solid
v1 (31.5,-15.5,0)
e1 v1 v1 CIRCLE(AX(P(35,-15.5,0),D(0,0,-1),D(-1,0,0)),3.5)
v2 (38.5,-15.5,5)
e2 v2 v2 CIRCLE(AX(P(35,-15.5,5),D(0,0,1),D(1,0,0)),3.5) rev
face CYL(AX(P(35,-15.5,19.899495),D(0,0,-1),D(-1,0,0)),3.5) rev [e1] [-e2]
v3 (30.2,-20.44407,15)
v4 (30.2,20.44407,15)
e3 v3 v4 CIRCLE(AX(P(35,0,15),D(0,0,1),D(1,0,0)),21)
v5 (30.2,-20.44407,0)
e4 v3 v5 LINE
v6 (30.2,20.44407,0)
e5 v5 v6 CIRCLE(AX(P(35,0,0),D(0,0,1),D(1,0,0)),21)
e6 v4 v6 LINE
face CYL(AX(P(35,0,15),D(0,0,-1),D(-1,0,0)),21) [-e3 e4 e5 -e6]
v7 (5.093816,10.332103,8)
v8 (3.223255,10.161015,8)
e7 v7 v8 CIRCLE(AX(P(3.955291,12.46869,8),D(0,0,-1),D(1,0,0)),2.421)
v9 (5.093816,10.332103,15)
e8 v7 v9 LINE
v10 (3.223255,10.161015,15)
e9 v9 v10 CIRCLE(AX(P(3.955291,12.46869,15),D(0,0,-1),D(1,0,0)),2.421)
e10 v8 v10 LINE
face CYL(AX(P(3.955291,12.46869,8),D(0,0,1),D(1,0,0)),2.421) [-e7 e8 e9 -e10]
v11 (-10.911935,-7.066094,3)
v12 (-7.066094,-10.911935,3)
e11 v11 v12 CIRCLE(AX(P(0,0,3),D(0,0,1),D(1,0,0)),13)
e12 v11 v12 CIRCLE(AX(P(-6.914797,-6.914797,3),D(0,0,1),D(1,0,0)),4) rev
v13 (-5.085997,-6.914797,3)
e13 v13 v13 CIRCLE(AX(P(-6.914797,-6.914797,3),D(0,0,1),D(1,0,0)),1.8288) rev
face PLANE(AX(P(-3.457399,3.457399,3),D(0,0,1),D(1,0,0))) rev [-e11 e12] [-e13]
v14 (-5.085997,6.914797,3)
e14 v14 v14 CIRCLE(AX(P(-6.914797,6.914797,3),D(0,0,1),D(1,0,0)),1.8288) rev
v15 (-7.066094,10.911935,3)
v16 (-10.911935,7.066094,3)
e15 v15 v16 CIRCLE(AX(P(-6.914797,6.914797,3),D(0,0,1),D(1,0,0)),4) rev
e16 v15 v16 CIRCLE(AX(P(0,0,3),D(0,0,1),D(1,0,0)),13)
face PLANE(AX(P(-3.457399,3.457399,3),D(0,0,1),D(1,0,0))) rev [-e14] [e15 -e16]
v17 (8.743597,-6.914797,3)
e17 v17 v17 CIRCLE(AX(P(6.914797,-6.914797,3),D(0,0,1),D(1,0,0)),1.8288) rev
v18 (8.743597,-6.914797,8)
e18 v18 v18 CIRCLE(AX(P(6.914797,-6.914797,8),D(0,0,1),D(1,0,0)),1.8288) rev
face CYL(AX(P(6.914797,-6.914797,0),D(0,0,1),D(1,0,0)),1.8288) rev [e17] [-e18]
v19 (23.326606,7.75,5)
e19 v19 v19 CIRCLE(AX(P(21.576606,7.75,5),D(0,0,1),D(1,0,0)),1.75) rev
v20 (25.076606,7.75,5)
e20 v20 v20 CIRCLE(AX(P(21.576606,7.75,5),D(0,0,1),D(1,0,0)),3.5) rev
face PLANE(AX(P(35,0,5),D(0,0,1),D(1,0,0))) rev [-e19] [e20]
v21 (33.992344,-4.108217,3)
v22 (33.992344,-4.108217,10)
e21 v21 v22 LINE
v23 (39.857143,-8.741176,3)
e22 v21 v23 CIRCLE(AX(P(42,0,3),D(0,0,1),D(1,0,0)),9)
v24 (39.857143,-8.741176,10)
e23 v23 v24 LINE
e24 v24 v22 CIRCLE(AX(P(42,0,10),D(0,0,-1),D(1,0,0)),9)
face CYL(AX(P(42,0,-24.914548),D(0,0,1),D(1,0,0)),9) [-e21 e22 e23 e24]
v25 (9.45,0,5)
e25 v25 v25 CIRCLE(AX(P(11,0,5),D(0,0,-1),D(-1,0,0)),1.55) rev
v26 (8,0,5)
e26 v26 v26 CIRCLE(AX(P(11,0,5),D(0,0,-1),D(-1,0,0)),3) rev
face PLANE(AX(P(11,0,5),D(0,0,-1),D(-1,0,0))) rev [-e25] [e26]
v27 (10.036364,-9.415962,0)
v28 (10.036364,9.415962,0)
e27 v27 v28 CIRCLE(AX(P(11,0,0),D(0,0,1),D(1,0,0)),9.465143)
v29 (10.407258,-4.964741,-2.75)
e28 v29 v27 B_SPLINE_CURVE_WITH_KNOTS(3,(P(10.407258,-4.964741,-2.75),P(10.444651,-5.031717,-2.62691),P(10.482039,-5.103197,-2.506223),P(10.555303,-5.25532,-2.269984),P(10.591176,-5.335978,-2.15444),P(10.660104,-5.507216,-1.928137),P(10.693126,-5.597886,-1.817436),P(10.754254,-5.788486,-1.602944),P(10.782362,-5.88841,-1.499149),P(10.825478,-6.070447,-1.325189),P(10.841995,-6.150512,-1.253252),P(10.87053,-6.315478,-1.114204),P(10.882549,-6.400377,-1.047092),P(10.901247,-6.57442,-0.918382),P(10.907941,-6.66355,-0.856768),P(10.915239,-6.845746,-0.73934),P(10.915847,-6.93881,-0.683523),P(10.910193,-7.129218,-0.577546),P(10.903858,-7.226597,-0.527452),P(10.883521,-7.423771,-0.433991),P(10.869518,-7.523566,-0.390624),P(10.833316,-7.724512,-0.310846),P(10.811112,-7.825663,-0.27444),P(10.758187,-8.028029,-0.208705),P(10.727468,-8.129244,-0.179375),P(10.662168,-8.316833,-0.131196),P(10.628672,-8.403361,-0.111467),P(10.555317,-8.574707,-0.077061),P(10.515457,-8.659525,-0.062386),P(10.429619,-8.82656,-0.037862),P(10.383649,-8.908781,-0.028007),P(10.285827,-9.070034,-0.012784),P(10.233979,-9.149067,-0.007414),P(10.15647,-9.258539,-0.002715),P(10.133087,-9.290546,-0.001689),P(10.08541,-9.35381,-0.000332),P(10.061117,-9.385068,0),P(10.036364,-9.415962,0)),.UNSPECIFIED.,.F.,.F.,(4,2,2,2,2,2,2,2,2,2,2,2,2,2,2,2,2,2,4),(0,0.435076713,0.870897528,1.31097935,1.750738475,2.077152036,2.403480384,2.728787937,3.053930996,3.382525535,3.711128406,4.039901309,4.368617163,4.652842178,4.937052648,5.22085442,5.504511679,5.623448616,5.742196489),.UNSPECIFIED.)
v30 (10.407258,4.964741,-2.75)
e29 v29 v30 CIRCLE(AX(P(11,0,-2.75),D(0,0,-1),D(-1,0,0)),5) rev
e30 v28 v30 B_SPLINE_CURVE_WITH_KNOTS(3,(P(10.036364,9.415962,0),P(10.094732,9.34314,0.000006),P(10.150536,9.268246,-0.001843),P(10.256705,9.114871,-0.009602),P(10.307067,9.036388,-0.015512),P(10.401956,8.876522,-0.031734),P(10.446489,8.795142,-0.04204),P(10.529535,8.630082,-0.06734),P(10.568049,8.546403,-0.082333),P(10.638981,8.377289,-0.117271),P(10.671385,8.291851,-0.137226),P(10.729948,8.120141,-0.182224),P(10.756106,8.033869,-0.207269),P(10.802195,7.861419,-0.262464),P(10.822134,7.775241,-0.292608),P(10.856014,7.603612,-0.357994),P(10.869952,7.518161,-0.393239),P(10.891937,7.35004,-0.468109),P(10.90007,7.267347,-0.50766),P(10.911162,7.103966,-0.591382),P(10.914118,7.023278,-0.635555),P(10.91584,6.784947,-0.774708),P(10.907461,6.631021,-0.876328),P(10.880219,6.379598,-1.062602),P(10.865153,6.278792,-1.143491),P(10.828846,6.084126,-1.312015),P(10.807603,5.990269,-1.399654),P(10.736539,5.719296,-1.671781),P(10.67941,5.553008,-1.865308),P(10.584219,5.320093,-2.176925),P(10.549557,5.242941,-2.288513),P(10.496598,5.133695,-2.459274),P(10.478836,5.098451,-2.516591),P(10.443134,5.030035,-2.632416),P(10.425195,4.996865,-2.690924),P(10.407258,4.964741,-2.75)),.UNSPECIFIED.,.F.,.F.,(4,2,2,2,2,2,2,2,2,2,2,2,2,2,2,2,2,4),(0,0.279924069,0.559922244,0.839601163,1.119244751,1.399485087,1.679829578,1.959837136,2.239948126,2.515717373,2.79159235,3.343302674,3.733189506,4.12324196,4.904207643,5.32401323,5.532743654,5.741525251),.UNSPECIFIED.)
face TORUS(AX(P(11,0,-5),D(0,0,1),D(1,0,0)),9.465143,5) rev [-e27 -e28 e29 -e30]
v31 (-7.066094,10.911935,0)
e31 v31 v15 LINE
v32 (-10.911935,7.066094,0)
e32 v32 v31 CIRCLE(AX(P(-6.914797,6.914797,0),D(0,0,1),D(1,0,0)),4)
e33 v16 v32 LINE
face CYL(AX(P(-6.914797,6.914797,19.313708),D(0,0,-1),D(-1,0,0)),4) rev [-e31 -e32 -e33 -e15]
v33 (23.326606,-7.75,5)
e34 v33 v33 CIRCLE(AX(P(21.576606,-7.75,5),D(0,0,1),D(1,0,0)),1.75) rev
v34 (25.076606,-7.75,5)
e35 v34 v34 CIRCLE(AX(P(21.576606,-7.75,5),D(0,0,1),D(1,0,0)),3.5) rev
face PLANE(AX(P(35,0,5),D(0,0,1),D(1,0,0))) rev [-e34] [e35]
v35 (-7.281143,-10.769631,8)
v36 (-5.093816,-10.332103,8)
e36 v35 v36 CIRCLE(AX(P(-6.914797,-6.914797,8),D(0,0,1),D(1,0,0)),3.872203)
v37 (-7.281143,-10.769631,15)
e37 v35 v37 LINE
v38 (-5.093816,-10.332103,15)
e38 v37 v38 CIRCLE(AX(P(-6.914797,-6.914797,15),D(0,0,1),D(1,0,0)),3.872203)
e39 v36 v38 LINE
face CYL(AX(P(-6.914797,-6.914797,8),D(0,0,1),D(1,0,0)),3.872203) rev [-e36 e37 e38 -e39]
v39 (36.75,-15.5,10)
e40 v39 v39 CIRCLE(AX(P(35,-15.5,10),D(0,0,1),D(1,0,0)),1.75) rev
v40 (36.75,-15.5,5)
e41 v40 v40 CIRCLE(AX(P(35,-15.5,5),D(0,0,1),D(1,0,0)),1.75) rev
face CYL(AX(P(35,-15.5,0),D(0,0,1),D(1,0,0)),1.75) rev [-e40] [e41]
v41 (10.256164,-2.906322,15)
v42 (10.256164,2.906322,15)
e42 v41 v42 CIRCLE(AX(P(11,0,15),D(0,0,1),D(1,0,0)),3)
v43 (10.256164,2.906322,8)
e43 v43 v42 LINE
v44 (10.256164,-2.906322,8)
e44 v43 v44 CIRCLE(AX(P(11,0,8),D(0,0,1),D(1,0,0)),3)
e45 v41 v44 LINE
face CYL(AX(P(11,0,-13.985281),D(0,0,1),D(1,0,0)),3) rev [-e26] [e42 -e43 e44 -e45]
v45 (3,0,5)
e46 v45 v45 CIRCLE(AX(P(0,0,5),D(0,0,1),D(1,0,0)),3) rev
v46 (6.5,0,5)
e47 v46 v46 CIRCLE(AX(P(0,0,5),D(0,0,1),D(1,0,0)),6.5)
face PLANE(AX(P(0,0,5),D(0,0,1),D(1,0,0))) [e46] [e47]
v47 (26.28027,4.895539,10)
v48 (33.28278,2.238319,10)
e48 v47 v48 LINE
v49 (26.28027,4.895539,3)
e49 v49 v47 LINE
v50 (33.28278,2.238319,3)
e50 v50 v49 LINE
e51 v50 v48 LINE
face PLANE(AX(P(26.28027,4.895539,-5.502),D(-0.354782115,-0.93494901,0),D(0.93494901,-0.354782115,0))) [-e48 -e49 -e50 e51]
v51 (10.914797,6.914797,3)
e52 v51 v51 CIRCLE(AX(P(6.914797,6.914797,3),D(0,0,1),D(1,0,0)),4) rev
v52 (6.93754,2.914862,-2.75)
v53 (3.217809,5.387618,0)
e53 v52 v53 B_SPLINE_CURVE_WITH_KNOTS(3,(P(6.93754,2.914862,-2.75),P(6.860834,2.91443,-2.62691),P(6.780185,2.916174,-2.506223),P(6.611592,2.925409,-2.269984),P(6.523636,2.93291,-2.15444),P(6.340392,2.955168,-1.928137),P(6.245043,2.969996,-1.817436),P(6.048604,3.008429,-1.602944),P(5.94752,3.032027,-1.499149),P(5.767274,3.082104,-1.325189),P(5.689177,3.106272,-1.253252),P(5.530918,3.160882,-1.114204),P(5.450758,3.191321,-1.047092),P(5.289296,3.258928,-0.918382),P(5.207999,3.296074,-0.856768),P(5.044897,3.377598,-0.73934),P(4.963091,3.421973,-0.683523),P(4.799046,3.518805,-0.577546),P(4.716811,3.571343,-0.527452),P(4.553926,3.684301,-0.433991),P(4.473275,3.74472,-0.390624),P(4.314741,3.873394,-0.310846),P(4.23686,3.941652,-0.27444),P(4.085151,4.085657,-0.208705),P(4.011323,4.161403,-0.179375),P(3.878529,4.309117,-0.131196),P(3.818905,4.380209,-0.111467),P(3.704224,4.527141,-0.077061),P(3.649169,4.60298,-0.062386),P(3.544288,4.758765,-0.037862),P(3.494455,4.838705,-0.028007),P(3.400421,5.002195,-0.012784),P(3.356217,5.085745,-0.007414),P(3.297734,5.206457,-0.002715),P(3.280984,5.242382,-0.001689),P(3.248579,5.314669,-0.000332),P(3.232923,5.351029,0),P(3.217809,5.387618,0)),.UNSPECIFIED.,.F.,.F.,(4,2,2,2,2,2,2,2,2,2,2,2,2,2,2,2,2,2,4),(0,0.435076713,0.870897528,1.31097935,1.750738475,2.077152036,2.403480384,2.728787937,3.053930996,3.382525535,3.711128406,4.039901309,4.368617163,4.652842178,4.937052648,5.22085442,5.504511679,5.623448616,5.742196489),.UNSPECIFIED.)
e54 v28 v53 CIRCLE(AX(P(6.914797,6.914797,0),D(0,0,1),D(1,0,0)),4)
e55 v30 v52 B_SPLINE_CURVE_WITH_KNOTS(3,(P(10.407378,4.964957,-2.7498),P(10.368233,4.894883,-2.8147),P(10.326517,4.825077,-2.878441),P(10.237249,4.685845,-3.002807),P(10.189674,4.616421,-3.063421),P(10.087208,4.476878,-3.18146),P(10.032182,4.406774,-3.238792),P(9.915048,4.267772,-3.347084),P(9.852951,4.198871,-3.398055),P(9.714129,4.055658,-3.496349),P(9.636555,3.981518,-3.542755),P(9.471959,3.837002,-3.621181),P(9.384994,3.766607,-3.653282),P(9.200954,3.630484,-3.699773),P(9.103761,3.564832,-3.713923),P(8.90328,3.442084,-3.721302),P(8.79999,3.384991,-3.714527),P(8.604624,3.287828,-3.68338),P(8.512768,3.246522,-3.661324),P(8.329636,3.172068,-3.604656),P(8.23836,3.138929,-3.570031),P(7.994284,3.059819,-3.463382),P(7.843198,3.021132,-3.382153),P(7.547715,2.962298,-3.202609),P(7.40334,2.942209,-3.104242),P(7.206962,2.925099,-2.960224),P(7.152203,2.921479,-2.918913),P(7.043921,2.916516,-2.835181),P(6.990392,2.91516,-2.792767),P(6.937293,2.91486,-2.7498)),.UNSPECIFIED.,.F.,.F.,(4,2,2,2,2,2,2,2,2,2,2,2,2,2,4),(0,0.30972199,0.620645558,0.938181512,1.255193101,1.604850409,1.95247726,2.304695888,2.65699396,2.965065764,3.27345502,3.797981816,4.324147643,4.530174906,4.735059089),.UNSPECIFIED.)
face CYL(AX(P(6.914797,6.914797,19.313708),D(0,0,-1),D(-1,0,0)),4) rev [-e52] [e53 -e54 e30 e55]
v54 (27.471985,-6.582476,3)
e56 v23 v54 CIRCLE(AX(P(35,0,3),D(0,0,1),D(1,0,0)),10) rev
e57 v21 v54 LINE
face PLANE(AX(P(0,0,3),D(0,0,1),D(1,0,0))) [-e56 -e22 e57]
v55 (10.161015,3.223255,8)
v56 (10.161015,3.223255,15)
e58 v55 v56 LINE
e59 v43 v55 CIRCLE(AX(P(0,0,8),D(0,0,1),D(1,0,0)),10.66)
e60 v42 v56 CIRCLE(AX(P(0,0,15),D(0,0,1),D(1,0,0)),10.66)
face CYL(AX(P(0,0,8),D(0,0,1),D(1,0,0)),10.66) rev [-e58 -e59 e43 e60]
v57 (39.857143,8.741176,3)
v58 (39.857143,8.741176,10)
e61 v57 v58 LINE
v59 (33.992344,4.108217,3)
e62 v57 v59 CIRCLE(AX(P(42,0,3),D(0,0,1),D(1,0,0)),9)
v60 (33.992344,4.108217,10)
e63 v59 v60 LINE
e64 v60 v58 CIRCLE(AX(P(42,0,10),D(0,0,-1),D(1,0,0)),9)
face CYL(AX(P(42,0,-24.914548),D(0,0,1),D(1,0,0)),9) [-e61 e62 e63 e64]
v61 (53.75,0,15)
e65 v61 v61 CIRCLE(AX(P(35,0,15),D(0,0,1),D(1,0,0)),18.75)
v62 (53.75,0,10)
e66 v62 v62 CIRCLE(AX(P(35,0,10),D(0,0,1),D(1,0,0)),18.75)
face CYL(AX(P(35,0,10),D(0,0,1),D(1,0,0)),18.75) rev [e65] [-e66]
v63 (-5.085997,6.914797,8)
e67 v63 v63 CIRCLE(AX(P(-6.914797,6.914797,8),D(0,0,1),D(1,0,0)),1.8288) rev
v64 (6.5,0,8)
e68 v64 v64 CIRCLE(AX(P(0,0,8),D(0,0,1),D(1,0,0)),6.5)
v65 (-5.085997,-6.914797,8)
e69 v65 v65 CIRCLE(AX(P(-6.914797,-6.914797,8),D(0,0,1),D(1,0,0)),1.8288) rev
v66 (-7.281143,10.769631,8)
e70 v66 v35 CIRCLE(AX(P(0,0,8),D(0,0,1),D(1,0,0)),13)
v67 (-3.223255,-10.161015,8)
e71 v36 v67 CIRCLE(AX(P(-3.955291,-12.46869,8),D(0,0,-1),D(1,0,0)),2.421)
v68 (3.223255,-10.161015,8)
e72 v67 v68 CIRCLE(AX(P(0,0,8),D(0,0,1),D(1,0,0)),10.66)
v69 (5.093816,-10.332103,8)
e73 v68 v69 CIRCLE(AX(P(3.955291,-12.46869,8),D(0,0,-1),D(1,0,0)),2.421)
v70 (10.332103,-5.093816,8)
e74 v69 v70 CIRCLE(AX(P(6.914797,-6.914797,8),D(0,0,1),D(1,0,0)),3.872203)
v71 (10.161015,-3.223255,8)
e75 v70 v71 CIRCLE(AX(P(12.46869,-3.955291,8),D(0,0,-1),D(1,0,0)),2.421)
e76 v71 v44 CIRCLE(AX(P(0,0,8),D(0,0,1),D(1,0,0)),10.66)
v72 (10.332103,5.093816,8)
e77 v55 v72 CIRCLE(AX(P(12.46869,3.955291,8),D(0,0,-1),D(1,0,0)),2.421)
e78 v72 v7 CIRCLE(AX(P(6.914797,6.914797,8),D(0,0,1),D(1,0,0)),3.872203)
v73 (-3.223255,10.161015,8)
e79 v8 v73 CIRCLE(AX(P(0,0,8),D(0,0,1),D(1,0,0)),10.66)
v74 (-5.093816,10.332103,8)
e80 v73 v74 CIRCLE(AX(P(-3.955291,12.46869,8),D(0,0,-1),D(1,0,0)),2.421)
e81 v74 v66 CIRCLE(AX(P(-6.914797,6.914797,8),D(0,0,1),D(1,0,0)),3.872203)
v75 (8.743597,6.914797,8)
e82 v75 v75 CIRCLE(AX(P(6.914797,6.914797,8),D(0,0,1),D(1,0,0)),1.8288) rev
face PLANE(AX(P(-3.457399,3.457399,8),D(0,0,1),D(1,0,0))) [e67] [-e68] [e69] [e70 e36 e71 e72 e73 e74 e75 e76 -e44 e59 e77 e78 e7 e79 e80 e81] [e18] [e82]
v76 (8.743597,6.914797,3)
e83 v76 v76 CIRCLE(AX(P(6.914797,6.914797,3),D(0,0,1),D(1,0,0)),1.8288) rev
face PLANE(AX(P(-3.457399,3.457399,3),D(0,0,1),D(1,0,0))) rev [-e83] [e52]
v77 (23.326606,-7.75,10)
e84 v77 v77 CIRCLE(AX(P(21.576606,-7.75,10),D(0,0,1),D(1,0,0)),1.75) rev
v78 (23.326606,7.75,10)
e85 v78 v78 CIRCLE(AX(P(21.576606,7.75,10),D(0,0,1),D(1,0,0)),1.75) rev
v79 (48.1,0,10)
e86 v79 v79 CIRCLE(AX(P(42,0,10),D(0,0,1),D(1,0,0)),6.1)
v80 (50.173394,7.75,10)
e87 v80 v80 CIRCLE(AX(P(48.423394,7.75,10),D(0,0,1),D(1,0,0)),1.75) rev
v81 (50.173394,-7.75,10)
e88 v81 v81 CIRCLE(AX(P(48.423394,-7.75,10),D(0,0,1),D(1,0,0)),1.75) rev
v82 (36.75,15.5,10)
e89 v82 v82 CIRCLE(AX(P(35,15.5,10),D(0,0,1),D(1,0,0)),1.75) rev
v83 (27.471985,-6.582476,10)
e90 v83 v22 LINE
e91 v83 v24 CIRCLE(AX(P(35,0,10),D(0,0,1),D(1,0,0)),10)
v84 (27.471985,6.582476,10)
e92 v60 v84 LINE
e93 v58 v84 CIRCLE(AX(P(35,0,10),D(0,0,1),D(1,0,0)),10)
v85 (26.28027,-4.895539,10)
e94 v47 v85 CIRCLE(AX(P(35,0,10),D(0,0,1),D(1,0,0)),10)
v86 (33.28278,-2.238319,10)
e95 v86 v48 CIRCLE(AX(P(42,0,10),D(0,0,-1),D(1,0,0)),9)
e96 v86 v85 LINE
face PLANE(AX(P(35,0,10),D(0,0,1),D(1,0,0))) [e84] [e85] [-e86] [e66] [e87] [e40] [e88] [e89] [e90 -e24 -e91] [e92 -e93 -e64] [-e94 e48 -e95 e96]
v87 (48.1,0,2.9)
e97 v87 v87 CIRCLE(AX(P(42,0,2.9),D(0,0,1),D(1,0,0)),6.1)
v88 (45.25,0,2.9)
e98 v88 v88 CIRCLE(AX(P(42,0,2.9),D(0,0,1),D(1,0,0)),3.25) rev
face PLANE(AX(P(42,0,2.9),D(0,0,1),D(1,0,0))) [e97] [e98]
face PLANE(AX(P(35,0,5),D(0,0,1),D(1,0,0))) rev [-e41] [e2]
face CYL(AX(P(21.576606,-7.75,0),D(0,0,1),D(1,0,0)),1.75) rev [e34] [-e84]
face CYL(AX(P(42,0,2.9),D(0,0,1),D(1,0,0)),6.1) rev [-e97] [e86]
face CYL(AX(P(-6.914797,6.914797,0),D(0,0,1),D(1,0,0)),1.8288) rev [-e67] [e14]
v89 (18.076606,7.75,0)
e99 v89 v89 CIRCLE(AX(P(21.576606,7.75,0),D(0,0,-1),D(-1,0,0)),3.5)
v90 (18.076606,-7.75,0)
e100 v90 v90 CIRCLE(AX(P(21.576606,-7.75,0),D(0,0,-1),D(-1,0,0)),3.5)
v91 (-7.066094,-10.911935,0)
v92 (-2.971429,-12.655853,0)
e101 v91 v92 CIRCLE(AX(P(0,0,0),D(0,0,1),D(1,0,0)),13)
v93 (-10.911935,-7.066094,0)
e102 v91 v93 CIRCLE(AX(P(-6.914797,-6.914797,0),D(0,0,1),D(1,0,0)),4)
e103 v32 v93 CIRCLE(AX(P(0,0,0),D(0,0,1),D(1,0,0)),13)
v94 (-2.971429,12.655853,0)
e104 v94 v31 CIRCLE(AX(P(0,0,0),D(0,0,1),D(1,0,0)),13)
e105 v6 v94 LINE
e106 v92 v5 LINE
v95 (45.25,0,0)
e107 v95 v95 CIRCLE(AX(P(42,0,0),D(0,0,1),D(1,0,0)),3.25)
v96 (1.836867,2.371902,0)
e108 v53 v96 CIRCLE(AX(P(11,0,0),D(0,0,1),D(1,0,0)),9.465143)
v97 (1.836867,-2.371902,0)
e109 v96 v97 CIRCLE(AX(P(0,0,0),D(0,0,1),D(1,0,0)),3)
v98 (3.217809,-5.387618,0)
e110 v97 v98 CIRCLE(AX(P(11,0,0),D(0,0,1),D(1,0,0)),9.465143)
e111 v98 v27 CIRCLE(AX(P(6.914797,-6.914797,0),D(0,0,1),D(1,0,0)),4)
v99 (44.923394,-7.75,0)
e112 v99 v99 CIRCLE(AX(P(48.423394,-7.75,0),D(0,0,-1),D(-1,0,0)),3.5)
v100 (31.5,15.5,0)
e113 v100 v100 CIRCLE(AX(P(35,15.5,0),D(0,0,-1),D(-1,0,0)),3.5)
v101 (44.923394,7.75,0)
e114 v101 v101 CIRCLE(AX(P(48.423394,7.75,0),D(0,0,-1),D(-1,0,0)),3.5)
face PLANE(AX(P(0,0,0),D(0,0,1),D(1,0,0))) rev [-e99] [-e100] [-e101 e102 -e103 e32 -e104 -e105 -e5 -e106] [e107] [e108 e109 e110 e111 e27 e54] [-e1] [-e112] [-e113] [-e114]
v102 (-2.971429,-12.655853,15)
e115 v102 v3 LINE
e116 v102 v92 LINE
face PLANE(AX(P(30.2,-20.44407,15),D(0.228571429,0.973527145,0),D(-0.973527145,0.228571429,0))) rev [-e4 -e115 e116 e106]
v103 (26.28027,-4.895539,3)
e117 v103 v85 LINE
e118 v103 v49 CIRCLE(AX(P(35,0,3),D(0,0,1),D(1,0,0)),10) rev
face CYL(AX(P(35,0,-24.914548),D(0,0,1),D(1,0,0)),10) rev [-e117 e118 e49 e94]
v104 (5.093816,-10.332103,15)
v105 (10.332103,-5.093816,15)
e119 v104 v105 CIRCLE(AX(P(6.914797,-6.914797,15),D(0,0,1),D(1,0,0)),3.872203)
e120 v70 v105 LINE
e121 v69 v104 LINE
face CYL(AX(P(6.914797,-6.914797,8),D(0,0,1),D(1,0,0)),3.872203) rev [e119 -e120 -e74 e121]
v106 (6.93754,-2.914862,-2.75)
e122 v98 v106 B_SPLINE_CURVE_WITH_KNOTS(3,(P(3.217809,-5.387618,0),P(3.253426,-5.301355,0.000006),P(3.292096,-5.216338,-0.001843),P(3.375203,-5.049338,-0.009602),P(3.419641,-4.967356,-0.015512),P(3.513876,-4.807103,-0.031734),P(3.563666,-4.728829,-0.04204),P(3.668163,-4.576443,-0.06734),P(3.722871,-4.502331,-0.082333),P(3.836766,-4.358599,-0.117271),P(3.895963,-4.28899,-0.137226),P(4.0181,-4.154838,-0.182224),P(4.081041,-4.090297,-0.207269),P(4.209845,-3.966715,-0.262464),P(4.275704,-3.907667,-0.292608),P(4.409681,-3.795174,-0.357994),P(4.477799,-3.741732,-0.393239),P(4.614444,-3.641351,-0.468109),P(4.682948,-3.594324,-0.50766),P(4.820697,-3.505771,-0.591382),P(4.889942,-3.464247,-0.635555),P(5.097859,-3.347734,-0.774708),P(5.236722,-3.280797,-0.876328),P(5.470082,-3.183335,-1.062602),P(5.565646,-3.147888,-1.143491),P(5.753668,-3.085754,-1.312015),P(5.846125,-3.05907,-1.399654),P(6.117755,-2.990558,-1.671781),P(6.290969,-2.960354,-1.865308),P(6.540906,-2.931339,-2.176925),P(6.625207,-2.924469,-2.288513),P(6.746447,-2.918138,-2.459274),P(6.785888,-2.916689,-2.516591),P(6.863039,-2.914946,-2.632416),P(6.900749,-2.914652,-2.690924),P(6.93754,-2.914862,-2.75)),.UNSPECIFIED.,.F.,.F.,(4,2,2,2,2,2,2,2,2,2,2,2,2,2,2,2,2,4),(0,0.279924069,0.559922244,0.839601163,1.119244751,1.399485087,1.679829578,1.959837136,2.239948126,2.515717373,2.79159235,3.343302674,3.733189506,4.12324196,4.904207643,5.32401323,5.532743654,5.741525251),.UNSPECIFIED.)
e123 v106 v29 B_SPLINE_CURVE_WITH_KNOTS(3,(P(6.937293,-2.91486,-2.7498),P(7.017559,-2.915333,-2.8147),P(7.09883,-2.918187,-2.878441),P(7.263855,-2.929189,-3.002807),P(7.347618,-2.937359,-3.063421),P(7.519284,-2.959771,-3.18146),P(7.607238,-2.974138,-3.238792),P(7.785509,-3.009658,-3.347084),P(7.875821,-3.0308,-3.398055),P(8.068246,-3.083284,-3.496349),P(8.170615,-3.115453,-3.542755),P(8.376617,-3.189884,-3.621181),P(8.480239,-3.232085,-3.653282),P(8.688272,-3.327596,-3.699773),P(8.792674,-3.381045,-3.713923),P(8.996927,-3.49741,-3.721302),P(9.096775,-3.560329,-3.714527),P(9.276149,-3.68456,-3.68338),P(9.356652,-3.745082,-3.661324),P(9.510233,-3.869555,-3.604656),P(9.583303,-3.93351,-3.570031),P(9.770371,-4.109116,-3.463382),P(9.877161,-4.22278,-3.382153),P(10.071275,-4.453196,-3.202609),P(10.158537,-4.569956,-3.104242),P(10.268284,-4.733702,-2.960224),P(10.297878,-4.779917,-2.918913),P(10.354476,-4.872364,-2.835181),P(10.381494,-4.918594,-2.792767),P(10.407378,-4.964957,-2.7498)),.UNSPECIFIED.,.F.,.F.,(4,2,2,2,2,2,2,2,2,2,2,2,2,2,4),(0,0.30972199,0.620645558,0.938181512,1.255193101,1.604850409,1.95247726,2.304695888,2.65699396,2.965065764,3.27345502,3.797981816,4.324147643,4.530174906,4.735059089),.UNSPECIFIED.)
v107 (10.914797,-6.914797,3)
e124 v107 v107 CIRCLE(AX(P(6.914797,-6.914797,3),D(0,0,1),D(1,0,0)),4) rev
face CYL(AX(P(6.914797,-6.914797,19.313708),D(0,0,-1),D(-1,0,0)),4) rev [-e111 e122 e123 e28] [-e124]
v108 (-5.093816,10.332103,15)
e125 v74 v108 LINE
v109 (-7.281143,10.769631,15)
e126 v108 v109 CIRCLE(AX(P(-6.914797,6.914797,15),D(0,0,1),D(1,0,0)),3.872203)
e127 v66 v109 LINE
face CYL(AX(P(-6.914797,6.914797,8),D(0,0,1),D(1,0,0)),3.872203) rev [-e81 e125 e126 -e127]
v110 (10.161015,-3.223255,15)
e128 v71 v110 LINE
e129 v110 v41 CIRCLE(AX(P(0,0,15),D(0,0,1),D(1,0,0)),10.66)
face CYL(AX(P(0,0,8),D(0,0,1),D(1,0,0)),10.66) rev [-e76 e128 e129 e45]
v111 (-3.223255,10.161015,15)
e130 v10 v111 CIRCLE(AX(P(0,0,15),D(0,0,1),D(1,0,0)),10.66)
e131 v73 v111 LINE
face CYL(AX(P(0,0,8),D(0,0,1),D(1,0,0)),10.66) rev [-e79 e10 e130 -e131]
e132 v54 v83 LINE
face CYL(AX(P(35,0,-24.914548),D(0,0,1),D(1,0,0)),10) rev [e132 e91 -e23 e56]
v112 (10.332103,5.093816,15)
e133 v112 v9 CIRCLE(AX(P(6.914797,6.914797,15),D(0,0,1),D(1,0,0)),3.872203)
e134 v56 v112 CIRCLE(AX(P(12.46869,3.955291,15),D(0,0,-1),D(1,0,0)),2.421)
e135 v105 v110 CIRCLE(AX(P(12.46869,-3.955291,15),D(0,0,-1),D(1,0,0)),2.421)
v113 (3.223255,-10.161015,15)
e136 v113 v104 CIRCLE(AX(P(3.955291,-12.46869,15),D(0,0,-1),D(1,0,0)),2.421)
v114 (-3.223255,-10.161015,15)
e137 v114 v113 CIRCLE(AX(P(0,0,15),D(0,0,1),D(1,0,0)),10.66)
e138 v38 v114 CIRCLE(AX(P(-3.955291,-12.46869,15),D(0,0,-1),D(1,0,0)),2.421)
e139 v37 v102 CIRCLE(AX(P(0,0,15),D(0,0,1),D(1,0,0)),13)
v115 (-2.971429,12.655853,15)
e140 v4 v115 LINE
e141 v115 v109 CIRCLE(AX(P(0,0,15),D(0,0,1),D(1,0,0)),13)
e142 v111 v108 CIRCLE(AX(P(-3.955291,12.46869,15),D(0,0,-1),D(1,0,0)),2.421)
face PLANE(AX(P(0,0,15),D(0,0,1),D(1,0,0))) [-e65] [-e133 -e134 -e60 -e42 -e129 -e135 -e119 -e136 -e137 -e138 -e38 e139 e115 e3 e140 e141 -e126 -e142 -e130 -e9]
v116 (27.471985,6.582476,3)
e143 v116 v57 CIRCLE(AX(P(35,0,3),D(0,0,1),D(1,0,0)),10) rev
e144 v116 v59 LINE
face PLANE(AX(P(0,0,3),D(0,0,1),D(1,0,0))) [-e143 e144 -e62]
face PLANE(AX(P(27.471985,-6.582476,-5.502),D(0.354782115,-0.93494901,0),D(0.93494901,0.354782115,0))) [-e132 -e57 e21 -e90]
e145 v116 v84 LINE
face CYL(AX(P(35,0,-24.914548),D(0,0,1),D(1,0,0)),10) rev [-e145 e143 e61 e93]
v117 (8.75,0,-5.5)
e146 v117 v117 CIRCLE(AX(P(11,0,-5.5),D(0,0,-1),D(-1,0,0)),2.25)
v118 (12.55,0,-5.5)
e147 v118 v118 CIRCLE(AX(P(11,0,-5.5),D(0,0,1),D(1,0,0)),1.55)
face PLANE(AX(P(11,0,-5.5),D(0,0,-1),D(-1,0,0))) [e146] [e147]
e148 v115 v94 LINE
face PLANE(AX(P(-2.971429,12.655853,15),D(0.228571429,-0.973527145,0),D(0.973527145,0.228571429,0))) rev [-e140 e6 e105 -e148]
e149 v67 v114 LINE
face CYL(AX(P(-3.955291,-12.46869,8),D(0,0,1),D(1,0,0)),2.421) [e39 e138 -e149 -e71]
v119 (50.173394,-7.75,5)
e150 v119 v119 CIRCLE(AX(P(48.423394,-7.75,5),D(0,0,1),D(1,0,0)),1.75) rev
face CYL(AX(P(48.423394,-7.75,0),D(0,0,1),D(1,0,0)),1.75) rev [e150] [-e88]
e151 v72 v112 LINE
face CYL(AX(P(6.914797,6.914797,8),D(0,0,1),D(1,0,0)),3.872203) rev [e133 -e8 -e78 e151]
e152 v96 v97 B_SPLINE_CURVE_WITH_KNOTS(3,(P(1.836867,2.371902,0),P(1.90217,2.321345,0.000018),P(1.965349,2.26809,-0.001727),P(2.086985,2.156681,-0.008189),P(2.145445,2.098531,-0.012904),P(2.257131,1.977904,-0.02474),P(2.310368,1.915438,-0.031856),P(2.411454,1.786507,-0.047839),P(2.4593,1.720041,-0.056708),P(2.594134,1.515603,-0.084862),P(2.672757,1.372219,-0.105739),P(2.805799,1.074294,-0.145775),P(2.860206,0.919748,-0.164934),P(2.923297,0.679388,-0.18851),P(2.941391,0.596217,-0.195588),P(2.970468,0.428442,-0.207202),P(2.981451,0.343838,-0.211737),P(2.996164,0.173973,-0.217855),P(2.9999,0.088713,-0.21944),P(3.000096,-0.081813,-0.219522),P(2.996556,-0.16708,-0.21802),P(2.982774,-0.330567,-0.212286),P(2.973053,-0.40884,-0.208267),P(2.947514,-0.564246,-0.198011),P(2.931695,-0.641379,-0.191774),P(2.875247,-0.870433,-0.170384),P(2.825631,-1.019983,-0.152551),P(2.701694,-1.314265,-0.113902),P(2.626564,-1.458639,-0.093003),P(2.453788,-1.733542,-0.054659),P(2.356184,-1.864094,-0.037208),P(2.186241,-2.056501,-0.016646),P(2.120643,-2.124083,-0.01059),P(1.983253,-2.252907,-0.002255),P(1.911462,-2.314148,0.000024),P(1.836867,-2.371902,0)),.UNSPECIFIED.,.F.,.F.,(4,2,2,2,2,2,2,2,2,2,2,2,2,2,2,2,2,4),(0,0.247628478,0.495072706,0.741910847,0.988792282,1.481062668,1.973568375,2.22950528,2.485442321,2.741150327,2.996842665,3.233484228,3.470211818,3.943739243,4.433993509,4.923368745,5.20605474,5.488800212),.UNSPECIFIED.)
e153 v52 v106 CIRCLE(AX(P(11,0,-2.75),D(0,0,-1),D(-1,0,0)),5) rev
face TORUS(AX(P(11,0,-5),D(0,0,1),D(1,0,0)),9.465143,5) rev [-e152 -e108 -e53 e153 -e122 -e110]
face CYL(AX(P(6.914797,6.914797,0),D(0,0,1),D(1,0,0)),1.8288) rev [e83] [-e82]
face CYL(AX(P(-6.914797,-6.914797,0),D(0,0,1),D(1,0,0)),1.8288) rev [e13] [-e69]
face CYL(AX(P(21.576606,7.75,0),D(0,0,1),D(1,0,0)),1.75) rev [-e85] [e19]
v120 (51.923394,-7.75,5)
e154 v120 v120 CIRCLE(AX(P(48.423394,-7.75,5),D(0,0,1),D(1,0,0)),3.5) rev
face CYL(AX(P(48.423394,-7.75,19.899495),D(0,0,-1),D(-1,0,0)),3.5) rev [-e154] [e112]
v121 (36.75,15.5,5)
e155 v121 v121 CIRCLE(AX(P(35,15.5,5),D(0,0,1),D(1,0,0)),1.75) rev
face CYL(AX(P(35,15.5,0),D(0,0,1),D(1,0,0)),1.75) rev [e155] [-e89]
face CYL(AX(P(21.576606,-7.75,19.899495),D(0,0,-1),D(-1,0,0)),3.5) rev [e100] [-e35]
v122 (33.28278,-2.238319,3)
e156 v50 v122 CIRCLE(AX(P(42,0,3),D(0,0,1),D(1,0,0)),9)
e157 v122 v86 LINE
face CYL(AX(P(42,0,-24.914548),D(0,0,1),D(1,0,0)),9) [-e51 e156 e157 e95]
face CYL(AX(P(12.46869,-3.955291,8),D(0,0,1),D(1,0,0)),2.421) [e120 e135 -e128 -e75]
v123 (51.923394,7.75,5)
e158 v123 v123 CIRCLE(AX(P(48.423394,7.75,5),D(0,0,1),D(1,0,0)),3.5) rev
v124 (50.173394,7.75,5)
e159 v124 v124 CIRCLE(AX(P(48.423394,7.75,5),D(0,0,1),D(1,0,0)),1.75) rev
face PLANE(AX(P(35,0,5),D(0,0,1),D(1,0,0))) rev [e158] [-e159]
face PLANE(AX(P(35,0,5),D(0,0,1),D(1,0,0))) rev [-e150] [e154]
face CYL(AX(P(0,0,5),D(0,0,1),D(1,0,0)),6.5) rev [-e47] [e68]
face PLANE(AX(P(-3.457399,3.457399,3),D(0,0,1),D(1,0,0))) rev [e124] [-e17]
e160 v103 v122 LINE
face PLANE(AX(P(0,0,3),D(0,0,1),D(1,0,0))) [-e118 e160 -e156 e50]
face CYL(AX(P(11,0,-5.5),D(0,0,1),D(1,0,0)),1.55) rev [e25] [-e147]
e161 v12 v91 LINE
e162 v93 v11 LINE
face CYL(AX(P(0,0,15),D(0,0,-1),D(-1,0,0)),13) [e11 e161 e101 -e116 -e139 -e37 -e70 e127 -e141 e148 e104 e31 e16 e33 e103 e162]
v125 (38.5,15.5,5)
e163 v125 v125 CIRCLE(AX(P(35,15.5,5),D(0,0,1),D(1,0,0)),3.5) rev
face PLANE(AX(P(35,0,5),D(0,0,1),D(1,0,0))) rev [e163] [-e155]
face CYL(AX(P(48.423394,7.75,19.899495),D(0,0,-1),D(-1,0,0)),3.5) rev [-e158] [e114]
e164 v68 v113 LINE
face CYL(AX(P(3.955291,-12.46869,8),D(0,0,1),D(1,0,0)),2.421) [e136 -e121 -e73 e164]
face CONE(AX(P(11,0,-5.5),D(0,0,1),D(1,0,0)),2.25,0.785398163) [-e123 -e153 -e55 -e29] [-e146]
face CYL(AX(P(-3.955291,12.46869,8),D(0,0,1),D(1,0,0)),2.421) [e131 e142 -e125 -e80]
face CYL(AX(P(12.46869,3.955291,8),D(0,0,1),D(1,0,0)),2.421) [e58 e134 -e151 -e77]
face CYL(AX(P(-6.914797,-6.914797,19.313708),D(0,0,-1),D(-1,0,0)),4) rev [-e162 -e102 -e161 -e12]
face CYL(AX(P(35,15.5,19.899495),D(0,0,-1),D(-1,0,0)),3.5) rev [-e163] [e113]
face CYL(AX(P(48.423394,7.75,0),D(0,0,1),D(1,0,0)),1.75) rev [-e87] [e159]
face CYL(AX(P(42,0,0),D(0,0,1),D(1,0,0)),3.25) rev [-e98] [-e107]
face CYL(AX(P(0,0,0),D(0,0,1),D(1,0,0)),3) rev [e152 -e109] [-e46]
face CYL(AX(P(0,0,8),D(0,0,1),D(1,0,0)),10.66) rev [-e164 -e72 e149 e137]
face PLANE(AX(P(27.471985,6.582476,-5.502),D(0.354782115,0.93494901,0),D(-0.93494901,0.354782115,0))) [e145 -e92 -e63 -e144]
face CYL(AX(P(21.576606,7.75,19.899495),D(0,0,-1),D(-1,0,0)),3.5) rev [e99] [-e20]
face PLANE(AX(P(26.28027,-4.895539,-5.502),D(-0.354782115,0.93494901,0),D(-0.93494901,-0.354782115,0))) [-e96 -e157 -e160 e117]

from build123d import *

# Parameters (mm, degrees)
BOSS_EXTRUDE1_DEPTH          = 15
SKETCH6_R                    = 3
SKETCH6_R_2                  = 1.8288
HUB_MOUNT_HOLE_PATTERN_DEPTH = 62.660360038
SKETCH7_R                    = 1.75
SKETCH7_R_2                  = 3.25
MOTOR_HOLE_PATTERN_DEPTH     = 62.660360038
SKETCH8_R                    = 18.75
MOTOR_CUTOUT_DEPTH           = 5
HUB_START                    = -7
HUB_MOUNT_CUTOUT_DEPTH       = 7
SKETCH10_R                   = 5
BOSS_EXTRUDE2_DEPTH          = 5.5
LINKAGE_PIN_HOLE_DEPTH       = 62.660360038
LINKAGE_PIN_HOLE_DEPTH_BACK  = 62.660360038
SKETCH12_R                   = 1.55
CHAMFER1_SIZE                = 2.75
SKETCH13_R                   = 6.1
CUT_EXTRUDE7_DEPTH           = 7.1
SKETCH14_R                   = 6.5
CUT_EXTRUDE8_DEPTH           = 3
SKETCH15_R                   = 3.5
CUT_EXTRUDE9_DEPTH           = 5
CUT_EXTRUDE10_DEPTH          = 62.312722986
CUT_EXTRUDE10_DEPTH_BACK     = 3
SKETCH16_R                   = 3
CUT_EXTRUDE12_DEPTH          = 7
BOSS_EXTRUDE3_REACH          = 63.784
CUT_EXTRUDE13_DEPTH          = 62.660360038
CUT_EXTRUDE13_DEPTH_BACK     = 3
SKETCH19_R                   = 4
FILLET1_R                    = 5


with BuildPart() as part:
    # Sketch2 → Boss-Extrude1 (new body)
    with BuildSketch(Plane.XY):
        with BuildLine():
            Line((-2.971428571, 12.655852885), (30.2, 20.444070045))
            ThreePointArc((30.2, 20.444070045), (56, 0), (30.2, -20.444070045))
            Line((30.2, -20.444070045), (-2.971428571, -12.655852885))
            ThreePointArc((-2.971428571, -12.655852885), (-13, 0), (-2.971428571, 12.655852885))
        make_face()
    extrude(amount=BOSS_EXTRUDE1_DEPTH)

    # Sketch6 → hub mount hole pattern (cut, through all)
    with BuildSketch(Plane.XY.offset(15)):
        Circle(SKETCH6_R)
        with Locations((-6.914797213, 6.914797213)):
            Circle(SKETCH6_R_2)
        with Locations((6.914797213, 6.914797213)):
            Circle(SKETCH6_R_2)
        with Locations((6.914797213, -6.914797213)):
            Circle(SKETCH6_R_2)
        with Locations((-6.914797213, -6.914797213)):
            Circle(SKETCH6_R_2)
    extrude(amount=-HUB_MOUNT_HOLE_PATTERN_DEPTH, mode=Mode.SUBTRACT)

    # Sketch7 → motor hole pattern (cut, through all)
    with BuildSketch(Plane.XY.offset(15)):
        with Locations((21.576606241, 7.75)):
            Circle(SKETCH7_R)
        with Locations((35, 15.5)):
            Circle(SKETCH7_R)
        with Locations((48.423393759, 7.75)):
            Circle(SKETCH7_R)
        with Locations((48.423393759, -7.75)):
            Circle(SKETCH7_R)
        with Locations((35, -15.5)):
            Circle(SKETCH7_R)
        with Locations((21.576606241, -7.75)):
            Circle(SKETCH7_R)
        with Locations((42, 0)):
            Circle(SKETCH7_R_2)
    extrude(amount=-MOTOR_HOLE_PATTERN_DEPTH, mode=Mode.SUBTRACT)

    # Sketch8 → motor cutout (cut)
    with BuildSketch(Plane.XY.offset(15)):
        with Locations((35, 0)):
            Circle(SKETCH8_R)
    extrude(amount=-MOTOR_CUTOUT_DEPTH, mode=Mode.SUBTRACT)

    # Sketch9 → hub mount cutout (cut)
    with BuildSketch(Plane.XY.offset(15).offset(HUB_START)):
        with BuildLine():
            ThreePointArc((-7.281143007, 10.769631215), (-13, 0), (-7.281143007, -10.769631215))
            ThreePointArc((-7.281143007, -10.769631215), (-6.15529138, -10.711783559), (-5.093815501, -10.332103173))
            ThreePointArc((-5.093815501, -10.332103173), (-4.17580433, -10.057753531), (-3.223255475, -10.161014917))
            ThreePointArc((-3.223255475, -10.161014917), (0, -10.66), (3.223255475, -10.161014917))
            ThreePointArc((3.223255475, -10.161014917), (4.17580433, -10.057753531), (5.093815501, -10.332103173))
            ThreePointArc((5.093815501, -10.332103173), (9.652858062, -9.652858062), (10.332103173, -5.093815501))
            ThreePointArc((10.332103173, -5.093815501), (10.057753531, -4.17580433), (10.161014917, -3.223255475))
            ThreePointArc((10.161014917, -3.223255475), (10.66, 0), (10.161014917, 3.223255475))
            ThreePointArc((10.161014917, 3.223255475), (10.057753531, 4.17580433), (10.332103173, 5.093815501))
            ThreePointArc((10.332103173, 5.093815501), (9.652858062, 9.652858062), (5.093815501, 10.332103173))
            ThreePointArc((5.093815501, 10.332103173), (4.17580433, 10.057753531), (3.223255475, 10.161014917))
            ThreePointArc((3.223255475, 10.161014917), (0, 10.66), (-3.223255475, 10.161014917))
            ThreePointArc((-3.223255475, 10.161014917), (-4.17580433, 10.057753531), (-5.093815501, 10.332103173))
            ThreePointArc((-5.093815501, 10.332103173), (-6.15529138, 10.711783559), (-7.281143007, 10.769631215))
        make_face()
    extrude(amount=HUB_MOUNT_CUTOUT_DEPTH, mode=Mode.SUBTRACT)

    # Sketch10 → Boss-Extrude2 (add)
    with BuildSketch(Plane(origin=(0, 0, 0), x_dir=(-1, 0, 0), z_dir=(0, 0, -1))):
        with Locations(Location((-11, 0, 0), (0, 0, 180))):
            Circle(SKETCH10_R)
    extrude(amount=BOSS_EXTRUDE2_DEPTH)

    # Sketch12 → Linkage pin hole (cut, two sides: drawn at the far end of the back side and taken through both)
    with BuildSketch(Plane.XY.offset(-LINKAGE_PIN_HOLE_DEPTH_BACK)):
        with Locations((11, 0)):
            Circle(SKETCH12_R)
    extrude(amount=LINKAGE_PIN_HOLE_DEPTH + LINKAGE_PIN_HOLE_DEPTH_BACK, mode=Mode.SUBTRACT)

    # Chamfer1
    chamfer1_edges = [part.edges().sort_by_distance(p)[0] for p in [
        (6, 0, -5.5),
    ]]
    chamfer(chamfer1_edges, length=CHAMFER1_SIZE)

    # Sketch13 → Cut-Extrude7 (cut)
    with BuildSketch(Plane.XY.offset(10)):
        with Locations((42, 0)):
            Circle(SKETCH13_R)
    extrude(amount=-CUT_EXTRUDE7_DEPTH, mode=Mode.SUBTRACT)

    # Sketch14 → Cut-Extrude8 (cut)
    with BuildSketch(Plane.XY.offset(8)):
        Circle(SKETCH14_R)
    extrude(amount=-CUT_EXTRUDE8_DEPTH, mode=Mode.SUBTRACT)

    # Sketch15 → Cut-Extrude9 (cut)
    with BuildSketch(Plane(origin=(0, 0, 0), x_dir=(-1, 0, 0), z_dir=(0, 0, -1))):
        with Locations((-21.576606241, -7.75)):
            Circle(SKETCH15_R)
        with Locations((-35, -15.5)):
            Circle(SKETCH15_R)
        with Locations((-48.423393759, -7.75)):
            Circle(SKETCH15_R)
        with Locations((-48.423393759, 7.75)):
            Circle(SKETCH15_R)
        with Locations((-35, 15.5)):
            Circle(SKETCH15_R)
        with Locations((-21.576606241, 7.75)):
            Circle(SKETCH15_R)
    extrude(amount=-CUT_EXTRUDE9_DEPTH, mode=Mode.SUBTRACT)

    # Sketch16 → Cut-Extrude10 (cut, two sides: drawn at the far end of the back side and taken through both)
    with BuildSketch(Plane.XY.offset(8).offset(-CUT_EXTRUDE10_DEPTH_BACK)):
        with Locations(Location((11, 0, 0), (0, 0, 104.35596801))):
            Circle(SKETCH16_R)
    extrude(amount=CUT_EXTRUDE10_DEPTH + CUT_EXTRUDE10_DEPTH_BACK, mode=Mode.SUBTRACT)

    # Sketch17 → Cut-Extrude12 (cut)
    with BuildSketch(Plane.XY.offset(10)):
        with BuildLine():
            ThreePointArc((39.857142857, 8.741176309), (25, 0), (39.857142857, -8.741176309))
            ThreePointArc((39.857142857, -8.741176309), (33, 0), (39.857142857, 8.741176309))
        make_face()
    extrude(amount=-CUT_EXTRUDE12_DEPTH, mode=Mode.SUBTRACT)

    # Sketch18 → Boss-Extrude3 (add, up to next)
    with BuildSketch(Plane.XY.offset(10), mode=Mode.PRIVATE) as boss_extrude3_sk1:
        with BuildLine():
            Line((27.471985333, -6.582476371), (33.992343948, -4.108216712))
            ThreePointArc((33.992343948, -4.108216712), (33.585458911, -3.193039032), (33.282779719, -2.238318693))
            Line((33.282779719, -2.238318693), (26.280269544, -4.895538864))
            ThreePointArc((26.280269544, -4.895538864), (26.83245784, -5.769857456), (27.471985333, -6.582476371))
        make_face()
    boss_extrude3_tool1 = extrude(boss_extrude3_sk1.sketch, amount=-BOSS_EXTRUDE3_REACH, mode=Mode.PRIVATE) - part.part
    # Sketch18 → Boss-Extrude3 (add, up to next)
    with BuildSketch(Plane.XY.offset(10), mode=Mode.PRIVATE) as boss_extrude3_sk2:
        with BuildLine():
            Line((27.471985333, 6.582476371), (33.992343948, 4.108216712))
            ThreePointArc((33.992343948, 4.108216712), (33.585458911, 3.193039032), (33.282779719, 2.238318693))
            Line((33.282779719, 2.238318693), (26.280269544, 4.895538864))
            ThreePointArc((26.280269544, 4.895538864), (26.83245784, 5.769857456), (27.471985333, 6.582476371))
        make_face()
    boss_extrude3_tool2 = extrude(boss_extrude3_sk2.sketch, amount=-BOSS_EXTRUDE3_REACH, mode=Mode.PRIVATE) - part.part
    add(boss_extrude3_tool1.solids().sort_by_distance((30.216616, -4.45872, 10))[0])
    add(boss_extrude3_tool2.solids().sort_by_distance((30.216616, 4.45872, 10))[0])

    # Sketch19 → Cut-Extrude13 (cut, two sides: drawn at the far end of the back side and taken through both)
    with BuildSketch(Plane(origin=(0, 0, 0), x_dir=(-1, 0, 0), z_dir=(0, 0, -1)).offset(-CUT_EXTRUDE13_DEPTH_BACK)):
        with Locations(Location((-6.914797213, -6.914797213, 0), (0, 0, 90.325769881))):
            Circle(SKETCH19_R)
        with Locations(Location((-6.914797213, 6.914797213, 0), (0, 0, 269.674230119))):
            Circle(SKETCH19_R)
        with Locations((6.914797213, 6.914797213)):
            Circle(SKETCH19_R)
        with Locations((6.914797213, -6.914797213)):
            Circle(SKETCH19_R)
    extrude(amount=CUT_EXTRUDE13_DEPTH + CUT_EXTRUDE13_DEPTH_BACK, mode=Mode.SUBTRACT)

    # Fillet1
    # the kernel refuses this fillet: 5 mm, written as the material it adds along each edge
    with BuildSketch(Plane(origin=(11, 0, 0), x_dir=(-0.9999950652018581, 0.003141587485879405, 0), z_dir=(-0.003141587485879405, -0.9999950652018581, 0))) as fillet1_piece_1_section:
        with BuildLine():
            CenterArc((9.465142775, 5), FILLET1_R, 206.74368395, 63.25631605)
            Line((9.465142775, 0), (9.465142775, -0.1))
            Line((9.465142775, -0.1), (5, -0.1))
            Line((5, -0.1), (4.9, 0))
            ThreePointArc((4.9, 0), (4.9, 1.375), (4.910697145, 2.705))
            Line((4.910697145, 2.705), (5, 2.75))
        make_face()
    fillet1_piece_1 = revolve(axis=Axis((11, 0, 0), (0, 0, -1)), revolution_arc=359.64, mode=Mode.PRIVATE)
    fillet1_piece_1 = fillet1_piece_1 - Plane(origin=(6.914797213, -6.914797213, -0.762875984), x_dir=(0.0056857263926290095, 0.9999838361270588, 0), z_dir=(0, 0, 1)) * Cylinder(4, 38, mode=Mode.PRIVATE)
    fillet1_piece_1 = fillet1_piece_1 - Plane(origin=(6.914797213, 6.914797213, -0.762875984), x_dir=(0.00568572639262881, -0.9999838361270588, 0), z_dir=(0, 0, 1)) * Cylinder(4, 38, mode=Mode.PRIVATE)
    fillet1_piece_1 = fillet1_piece_1 - Plane(origin=(0, 0, -0.762875984), x_dir=(1, 0, 0), z_dir=(0, 0, 1)) * Cylinder(3, 38, mode=Mode.PRIVATE)
    add(fillet1_piece_1)
    with BuildSketch(Plane(origin=(11, 0, 0), x_dir=(0.9593586032510993, -0.2821897772211103, 0), z_dir=(0.2821897772211103, 0.9593586032510993, 0))) as fillet1_piece_2_section:
        with BuildLine():
            CenterArc((9.465142775, 5), FILLET1_R, 206.74368395, 63.25631605)
            Line((9.465142775, 0), (9.465142775, -0.1))
            Line((9.465142775, -0.1), (5, -0.1))
            Line((5, -0.1), (4.9, 0))
            ThreePointArc((4.9, 0), (4.9, 1.375), (4.910697145, 2.705))
            Line((4.910697145, 2.705), (5, 2.75))
        make_face()
    fillet1_piece_2 = revolve(axis=Axis((11, 0, 0), (0, 0, -1)), revolution_arc=327.218117947, mode=Mode.PRIVATE)
    fillet1_piece_2 = fillet1_piece_2 - Plane(origin=(6.914797213, -6.914797213, -0.749324739), x_dir=(0.0056857263926290095, 0.9999838361270588, 0), z_dir=(0, 0, 1)) * Cylinder(4, 38, mode=Mode.PRIVATE)
    fillet1_piece_2 = fillet1_piece_2 - Plane(origin=(6.914797213, 6.914797213, -0.749324739), x_dir=(0.00568572639262881, -0.9999838361270588, 0), z_dir=(0, 0, 1)) * Cylinder(4, 38, mode=Mode.PRIVATE)
    fillet1_piece_2 = fillet1_piece_2 - Plane(origin=(0, 0, -0.749324739), x_dir=(1, 0, 0), z_dir=(0, 0, 1)) * Cylinder(3, 38, mode=Mode.PRIVATE)
    add(fillet1_piece_2)


solid = part.part
